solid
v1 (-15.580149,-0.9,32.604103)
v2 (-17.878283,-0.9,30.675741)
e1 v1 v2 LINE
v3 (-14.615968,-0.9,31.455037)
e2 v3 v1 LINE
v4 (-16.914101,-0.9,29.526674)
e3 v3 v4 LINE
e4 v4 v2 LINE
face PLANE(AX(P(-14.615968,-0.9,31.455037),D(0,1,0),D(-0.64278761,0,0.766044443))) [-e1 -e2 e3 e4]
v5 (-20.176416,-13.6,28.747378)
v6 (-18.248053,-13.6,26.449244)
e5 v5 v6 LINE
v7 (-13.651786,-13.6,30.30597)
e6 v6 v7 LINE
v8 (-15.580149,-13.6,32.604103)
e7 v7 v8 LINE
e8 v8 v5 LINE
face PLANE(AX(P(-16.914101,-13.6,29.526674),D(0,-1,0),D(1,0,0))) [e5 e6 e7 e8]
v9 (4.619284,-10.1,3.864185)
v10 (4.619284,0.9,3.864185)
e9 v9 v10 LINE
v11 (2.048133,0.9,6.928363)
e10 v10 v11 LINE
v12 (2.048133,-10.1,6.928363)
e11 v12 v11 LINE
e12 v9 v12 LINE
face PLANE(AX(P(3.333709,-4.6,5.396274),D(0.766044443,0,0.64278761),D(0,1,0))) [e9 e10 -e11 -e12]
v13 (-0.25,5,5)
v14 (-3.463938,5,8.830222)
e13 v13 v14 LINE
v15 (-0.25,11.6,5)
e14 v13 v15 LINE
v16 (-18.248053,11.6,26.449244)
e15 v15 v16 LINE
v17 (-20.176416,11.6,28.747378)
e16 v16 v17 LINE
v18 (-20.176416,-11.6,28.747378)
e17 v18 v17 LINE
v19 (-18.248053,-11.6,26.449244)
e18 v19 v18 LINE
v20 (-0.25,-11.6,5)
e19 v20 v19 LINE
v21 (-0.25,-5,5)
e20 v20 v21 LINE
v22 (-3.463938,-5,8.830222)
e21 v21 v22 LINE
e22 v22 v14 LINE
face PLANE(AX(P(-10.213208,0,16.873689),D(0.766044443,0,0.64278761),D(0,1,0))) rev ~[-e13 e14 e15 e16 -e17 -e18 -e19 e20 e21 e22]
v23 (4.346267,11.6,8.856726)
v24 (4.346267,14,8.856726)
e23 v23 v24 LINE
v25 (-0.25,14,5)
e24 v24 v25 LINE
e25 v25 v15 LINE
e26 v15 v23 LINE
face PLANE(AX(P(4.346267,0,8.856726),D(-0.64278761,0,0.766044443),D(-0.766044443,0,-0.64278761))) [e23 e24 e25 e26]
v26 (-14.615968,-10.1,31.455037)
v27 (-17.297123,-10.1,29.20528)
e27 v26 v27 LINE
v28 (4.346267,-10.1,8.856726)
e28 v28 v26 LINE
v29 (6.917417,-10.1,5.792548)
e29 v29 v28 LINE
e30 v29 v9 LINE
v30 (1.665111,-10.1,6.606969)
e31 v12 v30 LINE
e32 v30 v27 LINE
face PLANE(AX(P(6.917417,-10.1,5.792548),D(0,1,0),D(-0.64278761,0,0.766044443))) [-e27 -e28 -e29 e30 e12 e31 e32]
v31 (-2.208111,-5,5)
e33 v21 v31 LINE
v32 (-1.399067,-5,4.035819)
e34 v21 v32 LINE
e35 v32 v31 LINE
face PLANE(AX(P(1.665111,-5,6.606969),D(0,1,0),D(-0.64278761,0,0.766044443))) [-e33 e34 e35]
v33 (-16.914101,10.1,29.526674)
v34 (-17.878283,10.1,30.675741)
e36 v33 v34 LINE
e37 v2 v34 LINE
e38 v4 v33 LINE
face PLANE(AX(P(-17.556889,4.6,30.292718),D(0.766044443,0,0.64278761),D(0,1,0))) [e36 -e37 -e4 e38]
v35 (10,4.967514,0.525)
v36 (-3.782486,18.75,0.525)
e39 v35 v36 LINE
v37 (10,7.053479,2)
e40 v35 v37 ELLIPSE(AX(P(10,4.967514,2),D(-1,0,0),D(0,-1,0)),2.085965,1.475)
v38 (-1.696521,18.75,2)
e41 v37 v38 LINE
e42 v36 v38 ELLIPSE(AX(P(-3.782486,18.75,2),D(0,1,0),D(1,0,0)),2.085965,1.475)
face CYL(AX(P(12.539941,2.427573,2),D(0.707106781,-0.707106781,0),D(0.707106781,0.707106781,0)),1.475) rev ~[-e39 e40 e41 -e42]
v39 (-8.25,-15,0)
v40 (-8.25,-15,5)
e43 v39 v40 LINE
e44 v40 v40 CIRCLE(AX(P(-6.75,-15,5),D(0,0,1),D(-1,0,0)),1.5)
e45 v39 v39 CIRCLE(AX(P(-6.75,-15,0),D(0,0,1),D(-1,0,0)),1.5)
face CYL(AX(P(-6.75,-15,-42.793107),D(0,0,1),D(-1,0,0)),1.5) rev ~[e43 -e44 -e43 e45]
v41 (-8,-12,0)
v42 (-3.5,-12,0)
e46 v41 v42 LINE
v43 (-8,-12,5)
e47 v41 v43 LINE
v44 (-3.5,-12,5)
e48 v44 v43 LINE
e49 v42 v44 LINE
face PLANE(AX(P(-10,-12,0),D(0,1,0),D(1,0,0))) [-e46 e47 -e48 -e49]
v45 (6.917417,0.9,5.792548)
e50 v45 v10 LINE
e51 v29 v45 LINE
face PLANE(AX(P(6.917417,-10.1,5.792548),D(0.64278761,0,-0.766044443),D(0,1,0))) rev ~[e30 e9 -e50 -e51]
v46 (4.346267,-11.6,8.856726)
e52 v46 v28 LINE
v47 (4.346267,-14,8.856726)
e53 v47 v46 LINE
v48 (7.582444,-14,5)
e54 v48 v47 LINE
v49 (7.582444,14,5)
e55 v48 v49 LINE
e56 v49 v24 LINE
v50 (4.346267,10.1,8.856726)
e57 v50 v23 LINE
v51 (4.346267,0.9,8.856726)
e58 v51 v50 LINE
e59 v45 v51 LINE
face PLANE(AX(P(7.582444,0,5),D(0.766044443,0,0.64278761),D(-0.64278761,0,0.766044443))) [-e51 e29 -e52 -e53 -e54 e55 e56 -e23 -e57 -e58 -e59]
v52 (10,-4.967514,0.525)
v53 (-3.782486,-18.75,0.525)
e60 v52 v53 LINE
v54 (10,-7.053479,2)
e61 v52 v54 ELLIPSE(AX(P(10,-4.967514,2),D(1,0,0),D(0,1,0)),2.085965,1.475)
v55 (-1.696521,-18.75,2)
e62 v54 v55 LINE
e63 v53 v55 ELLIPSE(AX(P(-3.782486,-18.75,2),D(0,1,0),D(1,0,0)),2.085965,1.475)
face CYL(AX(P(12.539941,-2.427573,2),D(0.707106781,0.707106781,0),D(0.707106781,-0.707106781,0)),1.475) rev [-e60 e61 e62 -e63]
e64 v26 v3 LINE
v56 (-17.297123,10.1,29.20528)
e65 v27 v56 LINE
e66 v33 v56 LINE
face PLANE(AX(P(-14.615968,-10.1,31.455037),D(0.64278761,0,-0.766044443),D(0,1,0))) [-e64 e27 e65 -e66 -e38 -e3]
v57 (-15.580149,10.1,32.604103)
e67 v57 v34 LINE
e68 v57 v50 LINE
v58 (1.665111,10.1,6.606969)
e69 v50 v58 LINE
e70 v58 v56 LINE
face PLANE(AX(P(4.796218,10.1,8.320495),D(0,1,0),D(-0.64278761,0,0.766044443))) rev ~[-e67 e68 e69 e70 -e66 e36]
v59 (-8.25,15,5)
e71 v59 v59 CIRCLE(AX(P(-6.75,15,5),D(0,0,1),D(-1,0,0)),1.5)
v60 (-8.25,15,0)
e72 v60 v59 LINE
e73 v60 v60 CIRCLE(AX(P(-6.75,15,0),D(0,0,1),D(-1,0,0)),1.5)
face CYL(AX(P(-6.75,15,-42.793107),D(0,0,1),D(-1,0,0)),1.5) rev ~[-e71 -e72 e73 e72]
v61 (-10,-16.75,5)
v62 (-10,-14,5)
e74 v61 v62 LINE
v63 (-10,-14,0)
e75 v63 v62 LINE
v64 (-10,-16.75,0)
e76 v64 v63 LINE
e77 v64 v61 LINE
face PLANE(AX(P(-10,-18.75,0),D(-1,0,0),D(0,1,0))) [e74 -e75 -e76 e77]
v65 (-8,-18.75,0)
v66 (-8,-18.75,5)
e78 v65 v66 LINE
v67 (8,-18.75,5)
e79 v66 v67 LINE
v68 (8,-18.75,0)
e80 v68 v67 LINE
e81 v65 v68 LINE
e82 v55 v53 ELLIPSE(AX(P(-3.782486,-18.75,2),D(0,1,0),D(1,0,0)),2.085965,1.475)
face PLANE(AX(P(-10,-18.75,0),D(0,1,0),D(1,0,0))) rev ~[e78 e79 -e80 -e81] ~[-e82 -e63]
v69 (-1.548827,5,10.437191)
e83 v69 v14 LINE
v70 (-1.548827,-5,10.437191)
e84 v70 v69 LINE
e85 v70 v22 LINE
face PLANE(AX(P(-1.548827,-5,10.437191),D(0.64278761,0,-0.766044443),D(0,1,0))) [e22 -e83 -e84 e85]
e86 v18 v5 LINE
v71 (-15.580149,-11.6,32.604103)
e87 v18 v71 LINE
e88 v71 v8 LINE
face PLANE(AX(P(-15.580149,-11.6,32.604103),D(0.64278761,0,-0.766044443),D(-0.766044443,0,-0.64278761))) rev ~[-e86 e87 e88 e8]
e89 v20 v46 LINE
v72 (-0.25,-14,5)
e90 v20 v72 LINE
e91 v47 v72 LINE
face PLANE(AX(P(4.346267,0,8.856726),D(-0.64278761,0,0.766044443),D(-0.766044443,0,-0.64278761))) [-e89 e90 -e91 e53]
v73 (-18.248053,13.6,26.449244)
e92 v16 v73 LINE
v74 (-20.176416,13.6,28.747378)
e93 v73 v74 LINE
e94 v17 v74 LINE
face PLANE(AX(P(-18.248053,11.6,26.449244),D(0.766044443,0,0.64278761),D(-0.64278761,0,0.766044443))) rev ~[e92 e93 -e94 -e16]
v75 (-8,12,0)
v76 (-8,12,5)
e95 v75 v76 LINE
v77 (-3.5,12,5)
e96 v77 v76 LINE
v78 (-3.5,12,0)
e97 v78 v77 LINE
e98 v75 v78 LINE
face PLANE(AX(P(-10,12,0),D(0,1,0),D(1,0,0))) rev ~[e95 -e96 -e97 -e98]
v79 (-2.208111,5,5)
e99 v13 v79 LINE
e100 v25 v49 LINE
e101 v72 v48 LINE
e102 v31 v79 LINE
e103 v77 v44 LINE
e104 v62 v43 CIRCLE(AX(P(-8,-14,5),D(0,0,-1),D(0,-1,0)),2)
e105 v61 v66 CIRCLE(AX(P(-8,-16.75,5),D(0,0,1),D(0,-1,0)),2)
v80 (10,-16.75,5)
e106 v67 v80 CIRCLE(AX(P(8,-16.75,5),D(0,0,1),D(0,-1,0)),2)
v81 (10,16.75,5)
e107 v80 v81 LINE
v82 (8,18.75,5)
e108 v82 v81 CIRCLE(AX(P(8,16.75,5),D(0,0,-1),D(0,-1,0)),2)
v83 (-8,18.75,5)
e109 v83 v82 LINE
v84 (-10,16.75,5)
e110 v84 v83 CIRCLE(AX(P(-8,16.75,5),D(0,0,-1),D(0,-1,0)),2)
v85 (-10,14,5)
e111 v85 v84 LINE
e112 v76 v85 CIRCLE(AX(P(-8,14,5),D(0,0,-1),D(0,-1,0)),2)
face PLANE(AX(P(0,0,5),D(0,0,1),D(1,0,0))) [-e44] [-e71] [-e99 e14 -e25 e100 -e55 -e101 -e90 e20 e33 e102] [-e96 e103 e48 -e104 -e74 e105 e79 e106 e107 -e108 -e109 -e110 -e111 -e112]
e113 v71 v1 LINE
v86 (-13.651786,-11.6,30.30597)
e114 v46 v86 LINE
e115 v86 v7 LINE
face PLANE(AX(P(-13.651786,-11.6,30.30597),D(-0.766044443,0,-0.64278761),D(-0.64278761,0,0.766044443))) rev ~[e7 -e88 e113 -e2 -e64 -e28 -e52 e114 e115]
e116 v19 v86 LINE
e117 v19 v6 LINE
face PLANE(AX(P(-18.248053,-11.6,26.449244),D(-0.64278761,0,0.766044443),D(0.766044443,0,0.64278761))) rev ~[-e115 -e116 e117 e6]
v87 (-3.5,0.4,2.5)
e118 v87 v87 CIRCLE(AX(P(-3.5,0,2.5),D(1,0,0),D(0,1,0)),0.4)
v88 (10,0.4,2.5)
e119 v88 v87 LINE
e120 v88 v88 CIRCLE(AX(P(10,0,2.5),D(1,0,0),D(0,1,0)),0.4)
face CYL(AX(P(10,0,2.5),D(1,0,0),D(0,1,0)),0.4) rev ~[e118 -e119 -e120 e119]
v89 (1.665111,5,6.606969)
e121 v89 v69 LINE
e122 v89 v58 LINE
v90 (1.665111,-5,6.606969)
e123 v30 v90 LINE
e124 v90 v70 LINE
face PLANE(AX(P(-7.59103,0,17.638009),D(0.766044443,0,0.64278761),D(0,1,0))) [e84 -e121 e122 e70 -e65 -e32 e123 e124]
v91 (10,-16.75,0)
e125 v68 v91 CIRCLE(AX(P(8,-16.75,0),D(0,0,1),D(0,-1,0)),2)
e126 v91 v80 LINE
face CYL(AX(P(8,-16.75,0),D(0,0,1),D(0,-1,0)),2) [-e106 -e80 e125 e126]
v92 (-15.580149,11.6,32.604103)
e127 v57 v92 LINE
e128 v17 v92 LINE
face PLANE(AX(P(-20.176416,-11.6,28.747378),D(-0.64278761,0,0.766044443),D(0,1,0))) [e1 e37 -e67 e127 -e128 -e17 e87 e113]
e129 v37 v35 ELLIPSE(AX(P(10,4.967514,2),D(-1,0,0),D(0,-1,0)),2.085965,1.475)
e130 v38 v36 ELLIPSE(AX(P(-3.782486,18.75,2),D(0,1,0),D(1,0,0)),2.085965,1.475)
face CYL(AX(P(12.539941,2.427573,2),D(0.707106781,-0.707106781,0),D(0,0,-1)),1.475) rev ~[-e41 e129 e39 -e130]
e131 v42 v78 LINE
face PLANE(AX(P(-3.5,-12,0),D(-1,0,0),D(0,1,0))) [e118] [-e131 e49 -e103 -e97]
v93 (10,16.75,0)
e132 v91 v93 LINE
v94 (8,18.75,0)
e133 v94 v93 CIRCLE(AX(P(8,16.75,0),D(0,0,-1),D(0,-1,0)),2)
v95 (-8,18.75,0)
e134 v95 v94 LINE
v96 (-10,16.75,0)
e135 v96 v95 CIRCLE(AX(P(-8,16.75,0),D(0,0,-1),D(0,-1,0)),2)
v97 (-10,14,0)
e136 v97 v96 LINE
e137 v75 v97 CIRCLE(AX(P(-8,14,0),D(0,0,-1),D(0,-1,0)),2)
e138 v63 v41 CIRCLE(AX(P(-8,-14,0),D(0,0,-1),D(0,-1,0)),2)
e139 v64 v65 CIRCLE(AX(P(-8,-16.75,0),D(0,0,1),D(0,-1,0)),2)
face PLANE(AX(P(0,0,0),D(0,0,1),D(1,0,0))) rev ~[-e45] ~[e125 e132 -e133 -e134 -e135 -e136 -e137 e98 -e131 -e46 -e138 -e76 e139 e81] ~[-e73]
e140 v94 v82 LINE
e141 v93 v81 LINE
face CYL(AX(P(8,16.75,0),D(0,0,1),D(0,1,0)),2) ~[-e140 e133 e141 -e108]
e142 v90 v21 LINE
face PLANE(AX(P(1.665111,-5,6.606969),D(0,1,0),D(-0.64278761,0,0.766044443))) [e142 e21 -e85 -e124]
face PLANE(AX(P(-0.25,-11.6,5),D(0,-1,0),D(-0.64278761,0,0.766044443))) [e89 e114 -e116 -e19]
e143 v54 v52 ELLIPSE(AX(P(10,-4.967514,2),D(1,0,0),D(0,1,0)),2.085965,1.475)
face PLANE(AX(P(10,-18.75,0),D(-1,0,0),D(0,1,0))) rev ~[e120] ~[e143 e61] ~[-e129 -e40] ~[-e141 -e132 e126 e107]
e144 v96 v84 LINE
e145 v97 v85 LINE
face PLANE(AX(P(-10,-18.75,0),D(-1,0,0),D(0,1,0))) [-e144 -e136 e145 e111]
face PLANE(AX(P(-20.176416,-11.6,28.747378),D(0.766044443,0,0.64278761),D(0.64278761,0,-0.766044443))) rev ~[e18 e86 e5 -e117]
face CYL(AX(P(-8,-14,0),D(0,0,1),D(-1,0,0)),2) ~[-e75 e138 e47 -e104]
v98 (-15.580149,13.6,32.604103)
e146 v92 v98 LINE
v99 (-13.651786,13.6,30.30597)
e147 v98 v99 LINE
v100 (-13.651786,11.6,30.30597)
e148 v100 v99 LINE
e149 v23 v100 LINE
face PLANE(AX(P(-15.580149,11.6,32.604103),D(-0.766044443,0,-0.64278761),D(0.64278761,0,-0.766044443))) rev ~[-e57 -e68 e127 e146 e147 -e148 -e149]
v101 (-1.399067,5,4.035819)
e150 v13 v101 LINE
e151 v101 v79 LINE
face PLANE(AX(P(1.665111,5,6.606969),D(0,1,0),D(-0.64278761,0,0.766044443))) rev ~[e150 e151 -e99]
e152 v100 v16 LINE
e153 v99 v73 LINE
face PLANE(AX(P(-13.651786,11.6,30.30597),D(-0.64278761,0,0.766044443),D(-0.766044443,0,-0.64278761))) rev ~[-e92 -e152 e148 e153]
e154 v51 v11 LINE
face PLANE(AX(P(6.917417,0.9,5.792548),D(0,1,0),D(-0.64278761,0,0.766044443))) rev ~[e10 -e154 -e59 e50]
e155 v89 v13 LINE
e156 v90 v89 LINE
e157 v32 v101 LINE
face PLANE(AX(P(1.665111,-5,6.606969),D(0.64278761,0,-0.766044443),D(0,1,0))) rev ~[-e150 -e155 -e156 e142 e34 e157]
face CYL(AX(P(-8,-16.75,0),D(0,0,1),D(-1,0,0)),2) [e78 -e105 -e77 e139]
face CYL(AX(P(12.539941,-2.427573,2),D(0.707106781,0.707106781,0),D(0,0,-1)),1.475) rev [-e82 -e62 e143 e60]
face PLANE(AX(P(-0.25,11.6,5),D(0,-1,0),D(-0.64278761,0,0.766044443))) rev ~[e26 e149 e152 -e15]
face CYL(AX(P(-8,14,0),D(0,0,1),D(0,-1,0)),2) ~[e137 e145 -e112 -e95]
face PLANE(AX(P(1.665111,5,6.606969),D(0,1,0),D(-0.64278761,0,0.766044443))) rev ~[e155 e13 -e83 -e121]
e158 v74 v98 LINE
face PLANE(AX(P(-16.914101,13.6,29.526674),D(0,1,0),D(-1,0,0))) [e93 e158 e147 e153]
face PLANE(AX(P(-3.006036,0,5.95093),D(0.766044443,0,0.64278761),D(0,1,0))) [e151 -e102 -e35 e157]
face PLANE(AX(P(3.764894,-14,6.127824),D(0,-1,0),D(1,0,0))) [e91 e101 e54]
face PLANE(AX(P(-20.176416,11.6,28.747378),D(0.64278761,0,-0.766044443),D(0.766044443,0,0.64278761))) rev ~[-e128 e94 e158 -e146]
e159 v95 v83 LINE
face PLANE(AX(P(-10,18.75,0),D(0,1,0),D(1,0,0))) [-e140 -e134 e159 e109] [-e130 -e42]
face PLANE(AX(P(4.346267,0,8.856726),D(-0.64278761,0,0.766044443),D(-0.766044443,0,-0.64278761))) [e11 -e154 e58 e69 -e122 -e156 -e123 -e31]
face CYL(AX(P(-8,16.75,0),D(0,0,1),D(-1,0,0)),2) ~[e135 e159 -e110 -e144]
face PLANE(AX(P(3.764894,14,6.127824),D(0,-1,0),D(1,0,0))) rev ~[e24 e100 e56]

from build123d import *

# Parameters (mm, degrees)
F0_W      = 20
F0_H      = 37.5
F1_DEPTH  = 5
F3_D      = 3
F4_W      = 6.5
F4_H      = 24
F5_DEPTH  = 6
F6_R      = 2
F10_DEPTH = 50
F14_W     = 23.2
F14_H     = 31
F15_DEPTH = 6
F16_W     = 20.2
F16_H     = 30.2
F17_DEPTH = 3.5
F19_DEPTH = 14
F20_W     = 10
F20_H     = 5
F21_DEPTH = 4
F22_W     = 11
F22_H     = 2
F23_DEPTH = 3
F24_W     = 11
F24_H     = 4
F25_DEPTH = 3
F27_DEPTH = 2
F29_DEPTH = 2
F30_R     = 0.4
F31_DEPTH = 70


# Not quite as in the source:
# - a feature names something its author has since deleted; it is built from what else it names


with BuildPart() as f1:
    # F0 (on Top) → F1 (new body)
    with BuildSketch(Plane.XY):
        Rectangle(F0_W, F0_H)
    extrude(amount=F1_DEPTH)

    # F3 (through all)
    with Locations(Plane(origin=(0, 0, 0), x_dir=(1, 0, 0), z_dir=(0, 0, -1))):
        with Locations((-6.75, 15), (-6.75, -15)):
            Hole(F3_D / 2)

    # F4 (on Top) → F5 (cut)
    with BuildSketch(Plane.XY):
        with Locations((-6.75, 0)):
            Rectangle(F4_W, F4_H)
    extrude(amount=F5_DEPTH, mode=Mode.SUBTRACT)

    # F6
    f6_edges = [f1.edges().sort_by_distance(p)[0] for p in [
        (-10, -18.75, 2.5),
        (10, -18.75, 2.5),
        (10, 18.75, 2.5),
        (-10, 18.75, 2.5),
        (-10, -12, 2.5),
        (-10, 12, 2.5),
    ]]
    fillet(f6_edges, radius=F6_R)

    # F9 (on line) → F10 (cut)
    with BuildSketch(Plane(origin=(5.0561841595, -5.0561841595, 0), x_dir=(0.7071067812, 0.7071067812, 0), z_dir=(0.7071067812, -0.7071067812, 0))):
        with BuildLine():
            ThreePointArc((10.5836309448, 0.525), (11.626613447, 0.9570174977), (12.0586309448, 2))
            ThreePointArc((12.0586309448, 2), (9.5406484425, 3.0429825023), (10.5836309448, 0.525))
        make_face()
    extrude(amount=-F10_DEPTH, mode=Mode.SUBTRACT)

    # F11: F1 across plane


with BuildPart() as f1_1:
    add(f1.part)
    add(f1.part.mirror(Plane.XZ), mode=Mode.INTERSECT)

    # F14 (on line) → F15 (join)
    with BuildSketch(Plane(origin=(2.3153133603, 0, 1.9427785867), x_dir=(0, 1, 0), z_dir=(0.7660444431, 0, 0.6427876097))):
        with Locations((0, 19.490919118)):
            Rectangle(F14_W, F14_H)
    extrude(amount=F15_DEPTH)

    # F16 (on face) → F17 (cut)
    with BuildSketch(Plane(origin=(6.911580019, 0, 5.7995042448), x_dir=(0, 1, 0), z_dir=(0.7660444431, 0, 0.6427876097))):
        with Locations((0, 18.390919118)):
            Rectangle(F16_W, F16_H)
    extrude(amount=-F17_DEPTH, mode=Mode.SUBTRACT)

    # F18 (on Front) → F19 (join, symmetric)
    with BuildSketch(Plane.XZ):
        Polygon((4.3462666587, 8.8567256581), (-0.25, 5), (7.582443736, 5), align=None)
    extrude(amount=F19_DEPTH, both=True)

    # F20 (on face) → F21 (cut)
    with BuildSketch(Plane(origin=(4.2304244681, 0, 3.5497476109), x_dir=(0, 1, 0), z_dir=(0.7660444431, 0, 0.6427876097))):
        with Locations((0, 6.490919118)):
            Rectangle(F20_W, F20_H)
    extrude(amount=-F21_DEPTH, mode=Mode.SUBTRACT)

    # F22 (on face) → F23 (cut)
    with BuildSketch(Plane(origin=(6.911580019, 0, 5.7995042448), x_dir=(0, 1, 0), z_dir=(0.7660444431, 0, 0.6427876097))):
        with Locations((4.6, 34.490919118)):
            Rectangle(F22_W, F22_H)
    extrude(amount=-F23_DEPTH, mode=Mode.SUBTRACT)

    # F24 (on face) → F25 (cut)
    with BuildSketch(Plane(origin=(6.911580019, 0, 5.7995042448), x_dir=(0, 1, 0), z_dir=(0.7660444431, 0, 0.6427876097))):
        with Locations((-4.6, 1.990919118)):
            Rectangle(F24_W, F24_H)
    extrude(amount=-F25_DEPTH, mode=Mode.SUBTRACT)

    # F26 (on face) → F27 (join)
    with BuildSketch(Plane.XZ.offset(11.6)):
        Polygon((-15.5801492416, 32.6041033948), (-20.1764159003, 28.7473777367), (-18.2480530712, 26.4492444073), (-13.6517864125, 30.3059700655), align=None)
    extrude(amount=F27_DEPTH)

    # F28 (on face) → F29 (join)
    with BuildSketch(Plane(origin=(0, 11.6, 0), x_dir=(-1, 0, 0), z_dir=(0, 1, 0))):
        Polygon((20.1764159003, 28.7473777367), (15.5801492416, 32.6041033948), (13.6517864125, 30.3059700655), (18.2480530712, 26.4492444073), align=None)
    extrude(amount=F29_DEPTH)

    # F30 (on face) → F31 (cut)
    with BuildSketch(Plane.YZ.offset(10)):
        with Locations((0, 2.5)):
            Circle(F30_R)
    extrude(amount=-F31_DEPTH, mode=Mode.SUBTRACT)


solid = f1_1.part
